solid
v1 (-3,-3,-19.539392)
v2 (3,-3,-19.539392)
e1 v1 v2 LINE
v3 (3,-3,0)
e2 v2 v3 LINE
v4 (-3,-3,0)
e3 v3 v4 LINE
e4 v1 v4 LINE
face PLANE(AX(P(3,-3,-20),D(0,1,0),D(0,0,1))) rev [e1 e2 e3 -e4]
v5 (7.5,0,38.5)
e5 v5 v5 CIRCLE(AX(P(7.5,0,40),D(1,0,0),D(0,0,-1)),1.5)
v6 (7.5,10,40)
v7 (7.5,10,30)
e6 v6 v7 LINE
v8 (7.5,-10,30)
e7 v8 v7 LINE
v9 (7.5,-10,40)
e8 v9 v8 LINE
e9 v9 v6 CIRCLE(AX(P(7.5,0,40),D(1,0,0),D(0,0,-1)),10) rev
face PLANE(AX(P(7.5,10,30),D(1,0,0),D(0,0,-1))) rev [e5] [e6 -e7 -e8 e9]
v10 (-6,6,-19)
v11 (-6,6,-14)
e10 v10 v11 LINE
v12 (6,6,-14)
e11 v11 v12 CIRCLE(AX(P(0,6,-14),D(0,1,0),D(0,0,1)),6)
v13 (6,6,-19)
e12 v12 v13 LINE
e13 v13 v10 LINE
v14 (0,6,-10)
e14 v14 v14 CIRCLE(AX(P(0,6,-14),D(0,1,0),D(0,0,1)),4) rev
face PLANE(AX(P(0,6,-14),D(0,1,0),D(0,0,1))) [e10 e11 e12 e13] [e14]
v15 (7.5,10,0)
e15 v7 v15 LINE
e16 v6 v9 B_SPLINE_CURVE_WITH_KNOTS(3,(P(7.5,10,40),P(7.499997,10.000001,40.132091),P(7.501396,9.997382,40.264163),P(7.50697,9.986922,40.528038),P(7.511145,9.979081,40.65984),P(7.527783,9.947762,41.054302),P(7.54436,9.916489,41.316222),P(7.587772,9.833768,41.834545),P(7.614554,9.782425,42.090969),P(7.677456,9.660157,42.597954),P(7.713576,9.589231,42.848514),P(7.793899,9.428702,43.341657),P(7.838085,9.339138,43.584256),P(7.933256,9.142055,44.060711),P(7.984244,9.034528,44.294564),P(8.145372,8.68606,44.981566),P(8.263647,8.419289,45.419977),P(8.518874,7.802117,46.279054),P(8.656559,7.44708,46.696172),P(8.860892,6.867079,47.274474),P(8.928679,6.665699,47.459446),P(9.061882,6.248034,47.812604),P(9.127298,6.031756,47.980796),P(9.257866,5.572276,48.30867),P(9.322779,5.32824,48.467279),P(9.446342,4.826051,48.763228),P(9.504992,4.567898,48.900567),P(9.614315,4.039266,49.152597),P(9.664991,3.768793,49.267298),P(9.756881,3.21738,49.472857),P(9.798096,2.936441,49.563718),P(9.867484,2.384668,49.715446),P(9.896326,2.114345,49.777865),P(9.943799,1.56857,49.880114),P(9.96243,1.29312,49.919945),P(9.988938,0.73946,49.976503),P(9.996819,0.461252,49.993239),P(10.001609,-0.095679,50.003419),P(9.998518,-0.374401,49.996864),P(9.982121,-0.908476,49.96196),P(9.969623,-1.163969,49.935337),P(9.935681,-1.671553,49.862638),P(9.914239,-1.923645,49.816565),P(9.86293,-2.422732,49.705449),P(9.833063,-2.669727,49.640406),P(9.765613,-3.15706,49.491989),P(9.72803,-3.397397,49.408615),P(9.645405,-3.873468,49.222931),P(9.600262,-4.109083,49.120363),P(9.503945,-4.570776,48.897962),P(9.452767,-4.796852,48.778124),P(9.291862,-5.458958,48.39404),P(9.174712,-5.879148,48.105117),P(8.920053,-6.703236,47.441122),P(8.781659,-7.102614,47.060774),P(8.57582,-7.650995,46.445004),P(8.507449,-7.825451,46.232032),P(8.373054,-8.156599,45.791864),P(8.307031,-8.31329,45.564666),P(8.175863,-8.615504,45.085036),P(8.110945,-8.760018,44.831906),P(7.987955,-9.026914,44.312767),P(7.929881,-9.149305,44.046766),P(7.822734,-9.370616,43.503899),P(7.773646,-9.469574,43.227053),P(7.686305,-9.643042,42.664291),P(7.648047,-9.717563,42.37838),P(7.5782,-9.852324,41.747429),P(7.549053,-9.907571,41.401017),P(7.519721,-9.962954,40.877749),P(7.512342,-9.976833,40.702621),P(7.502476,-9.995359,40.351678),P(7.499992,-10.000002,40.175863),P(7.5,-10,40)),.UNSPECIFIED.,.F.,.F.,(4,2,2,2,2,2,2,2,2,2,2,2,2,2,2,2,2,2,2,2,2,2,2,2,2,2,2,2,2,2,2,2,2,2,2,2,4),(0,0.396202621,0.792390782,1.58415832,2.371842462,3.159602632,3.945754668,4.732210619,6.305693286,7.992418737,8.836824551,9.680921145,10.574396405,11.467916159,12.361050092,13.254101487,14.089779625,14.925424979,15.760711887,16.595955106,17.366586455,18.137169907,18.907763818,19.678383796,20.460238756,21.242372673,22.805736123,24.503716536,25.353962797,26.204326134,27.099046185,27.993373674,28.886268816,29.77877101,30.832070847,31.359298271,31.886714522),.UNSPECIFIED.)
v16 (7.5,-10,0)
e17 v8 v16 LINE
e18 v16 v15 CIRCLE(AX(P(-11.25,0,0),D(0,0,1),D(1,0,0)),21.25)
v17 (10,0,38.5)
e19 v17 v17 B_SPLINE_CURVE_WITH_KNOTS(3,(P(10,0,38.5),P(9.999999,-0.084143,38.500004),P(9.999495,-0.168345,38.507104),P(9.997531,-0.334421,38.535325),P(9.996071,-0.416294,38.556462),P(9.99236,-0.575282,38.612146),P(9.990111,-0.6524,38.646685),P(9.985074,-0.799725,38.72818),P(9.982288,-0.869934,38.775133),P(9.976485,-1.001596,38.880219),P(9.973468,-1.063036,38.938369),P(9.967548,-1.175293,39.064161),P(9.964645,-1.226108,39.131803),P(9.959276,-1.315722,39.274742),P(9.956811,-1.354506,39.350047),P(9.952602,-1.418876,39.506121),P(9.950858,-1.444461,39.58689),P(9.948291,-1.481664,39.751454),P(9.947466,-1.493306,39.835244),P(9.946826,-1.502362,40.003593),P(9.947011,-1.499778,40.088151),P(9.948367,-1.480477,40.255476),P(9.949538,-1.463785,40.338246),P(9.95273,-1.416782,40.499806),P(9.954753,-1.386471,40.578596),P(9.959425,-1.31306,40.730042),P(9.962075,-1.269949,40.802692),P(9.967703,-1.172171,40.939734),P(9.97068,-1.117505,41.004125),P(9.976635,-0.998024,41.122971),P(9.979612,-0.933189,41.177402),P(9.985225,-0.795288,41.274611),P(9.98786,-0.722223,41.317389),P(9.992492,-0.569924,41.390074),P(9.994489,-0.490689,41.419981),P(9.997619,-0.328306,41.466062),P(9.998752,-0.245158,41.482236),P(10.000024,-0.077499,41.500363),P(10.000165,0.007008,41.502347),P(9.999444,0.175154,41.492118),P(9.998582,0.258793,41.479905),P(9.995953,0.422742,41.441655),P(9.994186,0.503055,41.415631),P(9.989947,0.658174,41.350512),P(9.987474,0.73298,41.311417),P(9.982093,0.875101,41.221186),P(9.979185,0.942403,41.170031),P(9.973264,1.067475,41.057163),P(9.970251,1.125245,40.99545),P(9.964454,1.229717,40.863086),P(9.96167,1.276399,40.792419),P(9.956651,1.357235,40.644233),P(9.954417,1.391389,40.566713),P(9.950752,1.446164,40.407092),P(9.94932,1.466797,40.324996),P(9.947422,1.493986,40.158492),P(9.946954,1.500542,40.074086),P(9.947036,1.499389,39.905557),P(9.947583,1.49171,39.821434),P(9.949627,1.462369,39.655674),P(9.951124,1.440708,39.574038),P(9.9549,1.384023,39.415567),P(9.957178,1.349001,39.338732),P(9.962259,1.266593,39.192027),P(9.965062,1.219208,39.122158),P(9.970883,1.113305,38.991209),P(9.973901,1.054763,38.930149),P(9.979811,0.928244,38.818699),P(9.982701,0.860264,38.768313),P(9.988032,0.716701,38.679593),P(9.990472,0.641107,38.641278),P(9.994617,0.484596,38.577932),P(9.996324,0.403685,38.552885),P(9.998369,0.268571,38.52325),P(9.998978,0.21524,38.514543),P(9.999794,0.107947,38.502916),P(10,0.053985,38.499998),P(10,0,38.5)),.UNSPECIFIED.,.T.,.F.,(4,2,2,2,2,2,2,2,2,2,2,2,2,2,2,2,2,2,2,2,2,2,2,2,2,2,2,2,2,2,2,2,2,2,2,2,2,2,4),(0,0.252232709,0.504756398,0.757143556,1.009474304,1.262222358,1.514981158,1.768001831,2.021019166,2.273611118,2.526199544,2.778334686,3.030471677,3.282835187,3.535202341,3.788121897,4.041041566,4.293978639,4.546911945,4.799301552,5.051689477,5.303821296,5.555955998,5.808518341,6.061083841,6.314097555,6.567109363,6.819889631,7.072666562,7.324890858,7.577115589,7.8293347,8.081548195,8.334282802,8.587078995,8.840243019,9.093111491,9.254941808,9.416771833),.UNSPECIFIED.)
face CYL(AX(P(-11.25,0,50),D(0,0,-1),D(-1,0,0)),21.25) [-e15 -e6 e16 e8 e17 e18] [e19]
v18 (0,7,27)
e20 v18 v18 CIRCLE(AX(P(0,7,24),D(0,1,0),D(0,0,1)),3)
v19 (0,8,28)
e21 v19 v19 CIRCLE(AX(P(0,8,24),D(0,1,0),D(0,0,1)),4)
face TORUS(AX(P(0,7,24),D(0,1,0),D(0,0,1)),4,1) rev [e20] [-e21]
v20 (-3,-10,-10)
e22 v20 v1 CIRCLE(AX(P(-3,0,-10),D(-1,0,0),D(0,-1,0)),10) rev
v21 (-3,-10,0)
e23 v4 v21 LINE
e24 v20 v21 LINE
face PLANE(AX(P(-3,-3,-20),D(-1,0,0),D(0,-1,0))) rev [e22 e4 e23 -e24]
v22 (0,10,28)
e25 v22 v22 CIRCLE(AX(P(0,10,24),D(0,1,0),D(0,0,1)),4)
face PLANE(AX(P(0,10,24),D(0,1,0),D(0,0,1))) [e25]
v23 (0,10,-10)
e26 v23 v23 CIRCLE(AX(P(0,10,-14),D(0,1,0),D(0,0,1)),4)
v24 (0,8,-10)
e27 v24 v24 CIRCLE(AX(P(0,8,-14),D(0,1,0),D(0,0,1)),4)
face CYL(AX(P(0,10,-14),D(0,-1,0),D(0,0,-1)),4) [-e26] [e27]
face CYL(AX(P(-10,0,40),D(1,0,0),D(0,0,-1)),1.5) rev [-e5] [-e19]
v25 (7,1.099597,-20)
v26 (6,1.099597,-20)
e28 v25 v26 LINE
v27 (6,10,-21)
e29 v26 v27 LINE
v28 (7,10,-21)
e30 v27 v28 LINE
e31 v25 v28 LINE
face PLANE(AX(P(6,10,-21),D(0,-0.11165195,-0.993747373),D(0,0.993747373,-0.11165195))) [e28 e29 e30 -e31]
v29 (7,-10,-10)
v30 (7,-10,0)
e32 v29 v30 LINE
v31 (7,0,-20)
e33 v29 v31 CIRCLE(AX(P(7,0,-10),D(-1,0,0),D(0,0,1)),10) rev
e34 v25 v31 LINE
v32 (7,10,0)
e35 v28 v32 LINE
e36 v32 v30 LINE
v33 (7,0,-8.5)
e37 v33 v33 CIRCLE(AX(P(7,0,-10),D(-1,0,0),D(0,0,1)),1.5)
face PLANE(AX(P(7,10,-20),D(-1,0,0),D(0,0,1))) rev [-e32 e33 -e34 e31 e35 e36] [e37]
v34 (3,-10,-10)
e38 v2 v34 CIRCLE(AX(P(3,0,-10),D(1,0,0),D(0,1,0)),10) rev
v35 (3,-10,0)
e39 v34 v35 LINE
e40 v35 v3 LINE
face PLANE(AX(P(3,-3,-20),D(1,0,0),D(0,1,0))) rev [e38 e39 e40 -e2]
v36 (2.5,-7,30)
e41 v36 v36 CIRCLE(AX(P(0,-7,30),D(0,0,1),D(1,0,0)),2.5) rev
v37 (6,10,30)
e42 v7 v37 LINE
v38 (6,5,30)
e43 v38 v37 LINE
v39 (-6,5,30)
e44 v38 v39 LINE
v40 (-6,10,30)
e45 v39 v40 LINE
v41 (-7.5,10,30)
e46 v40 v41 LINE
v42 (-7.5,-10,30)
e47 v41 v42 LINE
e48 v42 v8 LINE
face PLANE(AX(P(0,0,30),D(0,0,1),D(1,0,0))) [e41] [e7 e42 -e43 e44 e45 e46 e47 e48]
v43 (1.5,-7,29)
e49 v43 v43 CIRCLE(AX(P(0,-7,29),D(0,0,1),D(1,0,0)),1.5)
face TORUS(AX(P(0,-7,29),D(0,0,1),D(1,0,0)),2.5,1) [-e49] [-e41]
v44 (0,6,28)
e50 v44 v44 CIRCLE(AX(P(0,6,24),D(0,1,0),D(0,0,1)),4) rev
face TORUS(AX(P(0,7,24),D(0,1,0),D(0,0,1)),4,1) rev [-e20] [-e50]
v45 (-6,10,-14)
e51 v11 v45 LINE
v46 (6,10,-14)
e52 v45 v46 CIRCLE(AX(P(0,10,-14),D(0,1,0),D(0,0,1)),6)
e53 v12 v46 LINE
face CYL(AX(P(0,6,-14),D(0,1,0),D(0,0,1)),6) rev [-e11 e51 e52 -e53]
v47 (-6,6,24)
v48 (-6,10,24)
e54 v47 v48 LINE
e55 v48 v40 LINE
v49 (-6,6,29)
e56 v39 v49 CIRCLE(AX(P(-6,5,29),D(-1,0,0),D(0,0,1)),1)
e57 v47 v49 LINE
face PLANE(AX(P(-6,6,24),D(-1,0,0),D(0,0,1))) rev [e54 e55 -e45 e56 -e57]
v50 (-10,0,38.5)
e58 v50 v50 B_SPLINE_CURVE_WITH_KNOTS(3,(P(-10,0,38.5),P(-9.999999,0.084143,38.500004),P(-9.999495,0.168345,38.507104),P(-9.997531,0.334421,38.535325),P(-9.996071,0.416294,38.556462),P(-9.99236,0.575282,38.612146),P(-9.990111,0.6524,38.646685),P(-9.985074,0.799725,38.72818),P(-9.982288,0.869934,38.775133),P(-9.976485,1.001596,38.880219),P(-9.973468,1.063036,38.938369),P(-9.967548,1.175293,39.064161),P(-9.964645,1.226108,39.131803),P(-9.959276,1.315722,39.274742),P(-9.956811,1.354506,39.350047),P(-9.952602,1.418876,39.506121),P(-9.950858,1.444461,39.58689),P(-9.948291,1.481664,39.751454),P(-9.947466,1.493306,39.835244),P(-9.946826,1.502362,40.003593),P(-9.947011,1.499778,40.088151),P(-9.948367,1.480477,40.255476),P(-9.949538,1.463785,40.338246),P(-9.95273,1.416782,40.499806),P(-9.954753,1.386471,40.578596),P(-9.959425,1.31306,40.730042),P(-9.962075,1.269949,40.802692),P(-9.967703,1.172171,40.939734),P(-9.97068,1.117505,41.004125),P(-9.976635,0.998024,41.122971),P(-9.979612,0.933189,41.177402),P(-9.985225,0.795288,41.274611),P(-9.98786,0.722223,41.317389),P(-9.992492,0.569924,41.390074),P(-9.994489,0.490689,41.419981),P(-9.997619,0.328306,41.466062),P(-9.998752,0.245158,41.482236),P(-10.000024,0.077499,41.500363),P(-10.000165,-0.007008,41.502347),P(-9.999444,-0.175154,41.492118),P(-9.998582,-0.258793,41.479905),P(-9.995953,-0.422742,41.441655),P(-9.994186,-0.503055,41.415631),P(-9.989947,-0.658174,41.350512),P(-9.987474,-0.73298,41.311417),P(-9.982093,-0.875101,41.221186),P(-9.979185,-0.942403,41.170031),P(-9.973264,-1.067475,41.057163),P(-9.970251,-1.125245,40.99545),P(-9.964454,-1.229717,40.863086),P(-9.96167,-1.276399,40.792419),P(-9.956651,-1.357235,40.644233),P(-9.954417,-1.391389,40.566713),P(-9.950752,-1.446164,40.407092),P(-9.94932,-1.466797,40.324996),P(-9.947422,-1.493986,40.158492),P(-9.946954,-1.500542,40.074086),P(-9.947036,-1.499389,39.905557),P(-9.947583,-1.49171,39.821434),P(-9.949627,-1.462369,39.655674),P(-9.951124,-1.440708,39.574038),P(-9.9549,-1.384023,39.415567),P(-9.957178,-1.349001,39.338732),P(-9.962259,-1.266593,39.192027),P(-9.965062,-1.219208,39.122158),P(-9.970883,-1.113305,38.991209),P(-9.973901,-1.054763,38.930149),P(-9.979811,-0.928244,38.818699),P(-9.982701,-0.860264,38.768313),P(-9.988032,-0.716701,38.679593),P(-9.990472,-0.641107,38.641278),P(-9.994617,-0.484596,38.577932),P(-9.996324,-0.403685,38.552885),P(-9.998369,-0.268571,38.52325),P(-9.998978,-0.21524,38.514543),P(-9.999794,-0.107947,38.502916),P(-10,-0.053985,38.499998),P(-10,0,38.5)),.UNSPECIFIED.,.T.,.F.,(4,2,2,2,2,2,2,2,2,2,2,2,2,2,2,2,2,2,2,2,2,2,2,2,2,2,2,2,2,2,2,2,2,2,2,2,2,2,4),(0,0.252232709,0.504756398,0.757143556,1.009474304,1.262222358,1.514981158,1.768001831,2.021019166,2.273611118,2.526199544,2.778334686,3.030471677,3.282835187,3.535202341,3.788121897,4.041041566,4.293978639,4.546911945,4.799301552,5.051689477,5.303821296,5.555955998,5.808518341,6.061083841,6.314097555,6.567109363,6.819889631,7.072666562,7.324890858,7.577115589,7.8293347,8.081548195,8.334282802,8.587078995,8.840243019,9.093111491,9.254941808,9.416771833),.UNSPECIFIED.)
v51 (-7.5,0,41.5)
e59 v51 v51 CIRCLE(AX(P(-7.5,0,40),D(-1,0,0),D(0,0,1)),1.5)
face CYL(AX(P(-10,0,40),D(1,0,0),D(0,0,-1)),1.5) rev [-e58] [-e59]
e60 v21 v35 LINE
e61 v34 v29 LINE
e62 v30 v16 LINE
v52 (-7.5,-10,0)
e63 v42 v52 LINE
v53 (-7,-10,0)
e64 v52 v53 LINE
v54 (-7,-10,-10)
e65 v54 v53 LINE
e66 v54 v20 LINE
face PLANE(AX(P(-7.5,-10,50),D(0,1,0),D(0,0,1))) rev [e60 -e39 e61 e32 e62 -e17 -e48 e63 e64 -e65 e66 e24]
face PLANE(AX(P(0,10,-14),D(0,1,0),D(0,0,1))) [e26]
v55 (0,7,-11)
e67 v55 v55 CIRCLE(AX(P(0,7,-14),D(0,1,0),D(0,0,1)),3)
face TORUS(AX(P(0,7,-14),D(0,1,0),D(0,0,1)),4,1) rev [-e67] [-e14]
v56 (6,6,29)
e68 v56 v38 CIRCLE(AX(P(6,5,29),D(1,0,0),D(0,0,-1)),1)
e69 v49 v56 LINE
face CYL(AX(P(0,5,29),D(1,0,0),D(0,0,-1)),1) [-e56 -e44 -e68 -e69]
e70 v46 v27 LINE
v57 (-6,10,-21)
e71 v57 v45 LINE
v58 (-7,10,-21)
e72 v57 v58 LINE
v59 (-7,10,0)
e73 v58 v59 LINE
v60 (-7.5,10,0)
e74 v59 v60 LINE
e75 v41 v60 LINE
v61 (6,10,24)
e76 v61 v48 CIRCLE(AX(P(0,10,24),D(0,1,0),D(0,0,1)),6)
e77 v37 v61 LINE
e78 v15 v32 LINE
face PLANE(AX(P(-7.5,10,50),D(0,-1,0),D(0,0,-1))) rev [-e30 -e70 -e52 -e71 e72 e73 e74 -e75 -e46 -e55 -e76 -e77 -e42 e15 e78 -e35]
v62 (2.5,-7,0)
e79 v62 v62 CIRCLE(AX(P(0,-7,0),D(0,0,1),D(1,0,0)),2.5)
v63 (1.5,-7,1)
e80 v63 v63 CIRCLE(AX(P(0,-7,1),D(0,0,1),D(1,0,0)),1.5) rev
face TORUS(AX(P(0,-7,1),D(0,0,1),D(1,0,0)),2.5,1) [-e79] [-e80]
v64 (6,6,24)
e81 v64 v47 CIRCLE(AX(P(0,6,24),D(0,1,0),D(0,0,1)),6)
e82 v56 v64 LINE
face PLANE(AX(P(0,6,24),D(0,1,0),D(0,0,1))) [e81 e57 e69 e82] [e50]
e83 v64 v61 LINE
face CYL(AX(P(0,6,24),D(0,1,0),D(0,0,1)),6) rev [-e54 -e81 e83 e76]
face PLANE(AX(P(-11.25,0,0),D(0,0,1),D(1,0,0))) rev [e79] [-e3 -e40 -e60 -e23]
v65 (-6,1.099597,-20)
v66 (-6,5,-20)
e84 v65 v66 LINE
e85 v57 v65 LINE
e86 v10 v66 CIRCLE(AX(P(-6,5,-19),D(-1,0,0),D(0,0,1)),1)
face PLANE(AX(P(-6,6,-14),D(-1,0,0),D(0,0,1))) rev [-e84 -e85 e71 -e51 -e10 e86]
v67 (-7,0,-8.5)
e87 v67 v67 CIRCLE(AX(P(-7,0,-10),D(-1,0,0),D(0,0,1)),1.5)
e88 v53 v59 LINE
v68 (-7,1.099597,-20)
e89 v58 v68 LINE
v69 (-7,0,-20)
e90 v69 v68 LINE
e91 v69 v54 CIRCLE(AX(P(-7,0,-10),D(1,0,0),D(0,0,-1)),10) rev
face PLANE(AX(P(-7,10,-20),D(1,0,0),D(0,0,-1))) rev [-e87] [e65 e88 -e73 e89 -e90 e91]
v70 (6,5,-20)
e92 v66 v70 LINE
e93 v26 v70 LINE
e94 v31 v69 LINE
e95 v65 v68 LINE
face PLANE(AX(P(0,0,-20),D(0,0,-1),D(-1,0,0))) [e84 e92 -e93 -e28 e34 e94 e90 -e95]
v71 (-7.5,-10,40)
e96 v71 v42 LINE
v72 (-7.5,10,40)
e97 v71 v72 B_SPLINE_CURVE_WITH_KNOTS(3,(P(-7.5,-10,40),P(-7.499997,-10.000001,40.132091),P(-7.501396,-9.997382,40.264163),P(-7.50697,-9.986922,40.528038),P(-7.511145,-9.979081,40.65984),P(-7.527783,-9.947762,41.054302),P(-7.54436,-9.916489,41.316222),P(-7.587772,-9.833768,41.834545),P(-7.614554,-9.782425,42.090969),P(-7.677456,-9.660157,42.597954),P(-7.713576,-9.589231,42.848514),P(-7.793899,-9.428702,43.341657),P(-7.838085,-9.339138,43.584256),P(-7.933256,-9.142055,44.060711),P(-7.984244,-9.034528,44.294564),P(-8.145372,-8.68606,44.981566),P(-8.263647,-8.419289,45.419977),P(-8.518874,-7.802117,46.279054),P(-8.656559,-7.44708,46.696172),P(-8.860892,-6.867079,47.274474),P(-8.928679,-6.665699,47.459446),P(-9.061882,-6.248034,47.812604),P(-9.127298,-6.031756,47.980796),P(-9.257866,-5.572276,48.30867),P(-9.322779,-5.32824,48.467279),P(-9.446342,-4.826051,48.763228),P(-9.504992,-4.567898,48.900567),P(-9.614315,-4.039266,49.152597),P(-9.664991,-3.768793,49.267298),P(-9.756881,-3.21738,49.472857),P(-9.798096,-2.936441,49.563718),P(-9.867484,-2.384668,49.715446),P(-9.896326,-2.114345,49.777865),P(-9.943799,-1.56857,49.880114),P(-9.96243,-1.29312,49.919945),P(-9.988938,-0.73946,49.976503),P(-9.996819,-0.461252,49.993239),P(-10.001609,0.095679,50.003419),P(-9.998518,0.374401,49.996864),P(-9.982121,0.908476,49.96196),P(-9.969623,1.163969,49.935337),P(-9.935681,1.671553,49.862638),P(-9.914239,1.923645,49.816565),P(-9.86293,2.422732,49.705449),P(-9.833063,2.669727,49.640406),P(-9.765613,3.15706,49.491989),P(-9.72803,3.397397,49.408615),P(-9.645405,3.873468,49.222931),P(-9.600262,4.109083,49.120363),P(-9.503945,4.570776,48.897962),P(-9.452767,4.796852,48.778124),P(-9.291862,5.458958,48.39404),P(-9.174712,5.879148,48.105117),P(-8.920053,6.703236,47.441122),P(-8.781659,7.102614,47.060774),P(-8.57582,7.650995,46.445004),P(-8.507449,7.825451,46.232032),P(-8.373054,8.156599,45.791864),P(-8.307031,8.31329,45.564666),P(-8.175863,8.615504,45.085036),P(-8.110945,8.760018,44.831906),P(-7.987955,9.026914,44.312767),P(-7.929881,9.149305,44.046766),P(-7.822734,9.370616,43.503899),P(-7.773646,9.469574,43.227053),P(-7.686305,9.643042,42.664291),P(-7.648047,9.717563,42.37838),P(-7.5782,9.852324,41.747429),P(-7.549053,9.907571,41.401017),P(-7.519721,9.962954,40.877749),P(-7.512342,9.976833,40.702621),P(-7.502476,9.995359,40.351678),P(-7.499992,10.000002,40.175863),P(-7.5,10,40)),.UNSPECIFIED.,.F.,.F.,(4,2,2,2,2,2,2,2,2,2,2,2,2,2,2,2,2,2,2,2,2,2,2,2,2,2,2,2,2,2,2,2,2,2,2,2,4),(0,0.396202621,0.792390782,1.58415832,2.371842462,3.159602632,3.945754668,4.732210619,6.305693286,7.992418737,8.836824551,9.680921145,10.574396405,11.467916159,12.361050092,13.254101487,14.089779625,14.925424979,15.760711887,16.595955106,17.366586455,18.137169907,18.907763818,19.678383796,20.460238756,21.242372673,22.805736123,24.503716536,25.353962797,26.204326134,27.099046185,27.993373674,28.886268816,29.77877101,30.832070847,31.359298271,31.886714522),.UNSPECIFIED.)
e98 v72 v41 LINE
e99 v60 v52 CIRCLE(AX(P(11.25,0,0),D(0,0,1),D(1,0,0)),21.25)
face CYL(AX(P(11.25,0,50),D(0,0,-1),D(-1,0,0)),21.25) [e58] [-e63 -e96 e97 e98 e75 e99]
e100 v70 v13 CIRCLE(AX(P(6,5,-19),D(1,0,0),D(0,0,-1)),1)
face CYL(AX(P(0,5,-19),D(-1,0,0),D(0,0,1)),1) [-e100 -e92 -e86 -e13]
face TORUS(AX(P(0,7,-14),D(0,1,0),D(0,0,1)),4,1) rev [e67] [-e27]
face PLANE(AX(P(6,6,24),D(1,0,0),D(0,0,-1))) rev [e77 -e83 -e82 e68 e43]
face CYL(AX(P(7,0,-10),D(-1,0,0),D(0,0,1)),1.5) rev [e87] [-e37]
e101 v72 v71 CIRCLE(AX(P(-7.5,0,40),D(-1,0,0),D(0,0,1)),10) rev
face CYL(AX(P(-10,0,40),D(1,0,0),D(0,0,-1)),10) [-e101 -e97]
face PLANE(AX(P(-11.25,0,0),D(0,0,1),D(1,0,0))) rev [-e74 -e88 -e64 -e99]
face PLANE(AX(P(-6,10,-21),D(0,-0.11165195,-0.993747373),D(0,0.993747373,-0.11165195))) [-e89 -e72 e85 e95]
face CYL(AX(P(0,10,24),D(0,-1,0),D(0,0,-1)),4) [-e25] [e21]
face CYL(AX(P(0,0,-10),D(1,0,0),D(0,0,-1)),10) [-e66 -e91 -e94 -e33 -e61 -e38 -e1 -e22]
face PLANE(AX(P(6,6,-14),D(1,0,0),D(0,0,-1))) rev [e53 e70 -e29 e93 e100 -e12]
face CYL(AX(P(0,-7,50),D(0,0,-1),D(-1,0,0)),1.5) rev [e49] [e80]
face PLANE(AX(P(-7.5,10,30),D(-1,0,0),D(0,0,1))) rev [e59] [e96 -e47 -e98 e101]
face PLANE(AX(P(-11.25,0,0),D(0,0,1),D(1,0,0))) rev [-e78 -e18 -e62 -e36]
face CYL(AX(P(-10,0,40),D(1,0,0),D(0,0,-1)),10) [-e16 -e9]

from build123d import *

# Parameters (mm, degrees)
SALIENTE_EXTRUIR2_DEPTH    = 50
CROQUIS4_R                 = 1.5
CORTAR_EXTRUIR1_DEPTH      = 50
SALIENTE_EXTRUIR3_DEPTH    = 20
CROQUIS8_R                 = 1.5
CORTAR_EXTRUIR4_DEPTH      = 14
REDONDEO1_R                = 10
CROQUIS6_W                 = 15
CROQUIS6_H                 = 20
CORTAR_EXTRUIR2_DEPTH      = 20
CORTAR_EXTRUIR3_DEPTH      = 52.961524227
CORTAR_EXTRUIR3_DEPTH_BACK = 52.961524227
CROQUIS7_R                 = 1.5
CUT_EXTRUDE1_DEPTH         = 4
SKETCH2_R                  = 3
BOSS_EXTRUDE1_DEPTH        = 2
SKETCH3_R                  = 4
BOSS_EXTRUDE2_DEPTH        = 2
FILLET2_R                  = 1
FILLET3_R                  = 1
FILLET4_R                  = 1
BOSS_EXTRUDE3_DEPTH        = 1
BOSS_EXTRUDE4_DEPTH        = 1


with BuildPart() as part:
    # Croquis2 → Saliente-Extruir2 (new body)
    with BuildSketch(Plane.XY):
        with BuildLine():
            Line((-7.5, -10), (7.5, -10))
            ThreePointArc((7.5, -10), (10, 0), (7.5, 10))
            Line((7.5, 10), (-7.5, 10))
            ThreePointArc((-7.5, 10), (-10, 0), (-7.5, -10))
        make_face()
    extrude(amount=SALIENTE_EXTRUIR2_DEPTH)

    # Croquis4 → Cortar-Extruir1 (cut)
    with BuildSketch(Plane(origin=(0, 0, 0), x_dir=(-1, 0, 0), z_dir=(0, 0, -1))):
        with Locations((0, -7)):
            Circle(CROQUIS4_R)
    extrude(amount=-CORTAR_EXTRUIR1_DEPTH, mode=Mode.SUBTRACT)

    # Croquis3 → Saliente-Extruir3 (add)
    with BuildSketch(Plane(origin=(0, 0, 0), x_dir=(-1, 0, 0), z_dir=(0, 0, -1))):
        Polygon((7, 10), (7, -10), (3, -10), (3, -3), (-3, -3), (-3, -10), (-7, -10), (-7, 10), align=None)
    extrude(amount=SALIENTE_EXTRUIR3_DEPTH)

    # Croquis8 → Cortar-Extruir4 (cut)
    with BuildSketch(Plane.ZY.offset(7)):
        with Locations((-10, 0)):
            Circle(CROQUIS8_R)
    extrude(amount=-CORTAR_EXTRUIR4_DEPTH, mode=Mode.SUBTRACT)

    # Redondeo1
    redondeo1_edges = [part.edges().sort_by_distance(p)[0] for p in [
        (5, -10, -20),
    ]]
    fillet(redondeo1_edges, radius=REDONDEO1_R)

    # Croquis6 → Cortar-Extruir2 (cut)
    with BuildSketch(Plane.XY.offset(50)):
        Rectangle(CROQUIS6_W, CROQUIS6_H)
    extrude(amount=-CORTAR_EXTRUIR2_DEPTH, mode=Mode.SUBTRACT)

    # Croquis7 → Cortar-Extruir3 (cut, two sides: drawn at the far end of the back side and taken through both)
    with BuildSketch(Plane(origin=(0, 0, 0), x_dir=(0, 0, -1), z_dir=(1, 0, 0)).offset(-CORTAR_EXTRUIR3_DEPTH_BACK)):
        with Locations((-40, 0)):
            Circle(CROQUIS7_R)
        with BuildLine():
            Line((-40, -10), (-55, -10))
            Line((-55, -10), (-55, 10))
            Line((-55, 10), (-40, 10))
            ThreePointArc((-40, 10), (-50, 0), (-40, -10))
        make_face()
    extrude(amount=CORTAR_EXTRUIR3_DEPTH + CORTAR_EXTRUIR3_DEPTH_BACK, mode=Mode.SUBTRACT)

    # Sketch1 → Cut-Extrude1 (cut)
    with BuildSketch(Plane(origin=(0, 10, 0), x_dir=(1, 0, 0), z_dir=(0, 1, 0))):
        with BuildLine():
            Line((-6, -24), (-6, -30))
            Line((-6, -30), (6, -30))
            Line((6, -30), (6, -24))
            ThreePointArc((6, -24), (0, -18), (-6, -24))
        make_face()
        with BuildLine():
            Line((-6, 14), (-6, 20))
            Line((-6, 20), (6, 20))
            Line((6, 20), (6, 14))
            ThreePointArc((6, 14), (0, 8), (-6, 14))
        make_face()
    extrude(amount=-CUT_EXTRUDE1_DEPTH, mode=Mode.SUBTRACT)

    # Sketch2 → Boss-Extrude1 (add)
    with BuildSketch(Plane(origin=(0, 6, 0), x_dir=(1, 0, 0), z_dir=(0, 1, 0))):
        with Locations(Location((0, -24, 0), (0, 0, 270))):
            Circle(SKETCH2_R)
        with Locations(Location((0, 14, 0), (0, 0, 270))):
            Circle(SKETCH2_R)
    extrude(amount=BOSS_EXTRUDE1_DEPTH)

    # Sketch3 → Boss-Extrude2 (add)
    with BuildSketch(Plane(origin=(0, 8, 0), x_dir=(1, 0, 0), z_dir=(0, 1, 0))):
        with Locations(Location((0, -24, 0), (0, 0, 270))):
            Circle(SKETCH3_R)
        with Locations(Location((0, 14, 0), (0, 0, 270))):
            Circle(SKETCH3_R)
    extrude(amount=BOSS_EXTRUDE2_DEPTH)

    # Fillet2
    fillet2_edges = [part.edges().sort_by_distance(p)[0] for p in [
        (0, 6, 21),
        (0, 8, 21),
        (0, 6, -17),
        (0, 8, -17),
    ]]
    fillet(fillet2_edges, radius=FILLET2_R - 0.0001)  # a hair under: the kernel refuses the full size

    # Fillet3
    fillet3_edges = [part.edges().sort_by_distance(p)[0] for p in [
        (0, 6, 30),
        (0, 6, -20),
    ]]
    fillet(fillet3_edges, radius=FILLET3_R)

    # Fillet4
    fillet4_edges = [part.edges().sort_by_distance(p)[0] for p in [
        (1.5, -7, 0),
        (1.5, -7, 30),
    ]]
    fillet(fillet4_edges, radius=FILLET4_R)

    # Sketch4 → Boss-Extrude3 (add)
    with BuildSketch(Plane(origin=(7, 0, 0), x_dir=(0, 0, -1), z_dir=(1, 0, 0))):
        Polygon((20, 10), (21, 10), (19.539392014, -3), align=None)
    extrude(amount=-BOSS_EXTRUDE3_DEPTH)

    # Sketch5 → Boss-Extrude4 (add)
    with BuildSketch(Plane.ZY.offset(7)):
        Polygon((-20, 10), (-21, 10), (-19.539392014, -3), align=None)
    extrude(amount=-BOSS_EXTRUDE4_DEPTH)


solid = part.part
